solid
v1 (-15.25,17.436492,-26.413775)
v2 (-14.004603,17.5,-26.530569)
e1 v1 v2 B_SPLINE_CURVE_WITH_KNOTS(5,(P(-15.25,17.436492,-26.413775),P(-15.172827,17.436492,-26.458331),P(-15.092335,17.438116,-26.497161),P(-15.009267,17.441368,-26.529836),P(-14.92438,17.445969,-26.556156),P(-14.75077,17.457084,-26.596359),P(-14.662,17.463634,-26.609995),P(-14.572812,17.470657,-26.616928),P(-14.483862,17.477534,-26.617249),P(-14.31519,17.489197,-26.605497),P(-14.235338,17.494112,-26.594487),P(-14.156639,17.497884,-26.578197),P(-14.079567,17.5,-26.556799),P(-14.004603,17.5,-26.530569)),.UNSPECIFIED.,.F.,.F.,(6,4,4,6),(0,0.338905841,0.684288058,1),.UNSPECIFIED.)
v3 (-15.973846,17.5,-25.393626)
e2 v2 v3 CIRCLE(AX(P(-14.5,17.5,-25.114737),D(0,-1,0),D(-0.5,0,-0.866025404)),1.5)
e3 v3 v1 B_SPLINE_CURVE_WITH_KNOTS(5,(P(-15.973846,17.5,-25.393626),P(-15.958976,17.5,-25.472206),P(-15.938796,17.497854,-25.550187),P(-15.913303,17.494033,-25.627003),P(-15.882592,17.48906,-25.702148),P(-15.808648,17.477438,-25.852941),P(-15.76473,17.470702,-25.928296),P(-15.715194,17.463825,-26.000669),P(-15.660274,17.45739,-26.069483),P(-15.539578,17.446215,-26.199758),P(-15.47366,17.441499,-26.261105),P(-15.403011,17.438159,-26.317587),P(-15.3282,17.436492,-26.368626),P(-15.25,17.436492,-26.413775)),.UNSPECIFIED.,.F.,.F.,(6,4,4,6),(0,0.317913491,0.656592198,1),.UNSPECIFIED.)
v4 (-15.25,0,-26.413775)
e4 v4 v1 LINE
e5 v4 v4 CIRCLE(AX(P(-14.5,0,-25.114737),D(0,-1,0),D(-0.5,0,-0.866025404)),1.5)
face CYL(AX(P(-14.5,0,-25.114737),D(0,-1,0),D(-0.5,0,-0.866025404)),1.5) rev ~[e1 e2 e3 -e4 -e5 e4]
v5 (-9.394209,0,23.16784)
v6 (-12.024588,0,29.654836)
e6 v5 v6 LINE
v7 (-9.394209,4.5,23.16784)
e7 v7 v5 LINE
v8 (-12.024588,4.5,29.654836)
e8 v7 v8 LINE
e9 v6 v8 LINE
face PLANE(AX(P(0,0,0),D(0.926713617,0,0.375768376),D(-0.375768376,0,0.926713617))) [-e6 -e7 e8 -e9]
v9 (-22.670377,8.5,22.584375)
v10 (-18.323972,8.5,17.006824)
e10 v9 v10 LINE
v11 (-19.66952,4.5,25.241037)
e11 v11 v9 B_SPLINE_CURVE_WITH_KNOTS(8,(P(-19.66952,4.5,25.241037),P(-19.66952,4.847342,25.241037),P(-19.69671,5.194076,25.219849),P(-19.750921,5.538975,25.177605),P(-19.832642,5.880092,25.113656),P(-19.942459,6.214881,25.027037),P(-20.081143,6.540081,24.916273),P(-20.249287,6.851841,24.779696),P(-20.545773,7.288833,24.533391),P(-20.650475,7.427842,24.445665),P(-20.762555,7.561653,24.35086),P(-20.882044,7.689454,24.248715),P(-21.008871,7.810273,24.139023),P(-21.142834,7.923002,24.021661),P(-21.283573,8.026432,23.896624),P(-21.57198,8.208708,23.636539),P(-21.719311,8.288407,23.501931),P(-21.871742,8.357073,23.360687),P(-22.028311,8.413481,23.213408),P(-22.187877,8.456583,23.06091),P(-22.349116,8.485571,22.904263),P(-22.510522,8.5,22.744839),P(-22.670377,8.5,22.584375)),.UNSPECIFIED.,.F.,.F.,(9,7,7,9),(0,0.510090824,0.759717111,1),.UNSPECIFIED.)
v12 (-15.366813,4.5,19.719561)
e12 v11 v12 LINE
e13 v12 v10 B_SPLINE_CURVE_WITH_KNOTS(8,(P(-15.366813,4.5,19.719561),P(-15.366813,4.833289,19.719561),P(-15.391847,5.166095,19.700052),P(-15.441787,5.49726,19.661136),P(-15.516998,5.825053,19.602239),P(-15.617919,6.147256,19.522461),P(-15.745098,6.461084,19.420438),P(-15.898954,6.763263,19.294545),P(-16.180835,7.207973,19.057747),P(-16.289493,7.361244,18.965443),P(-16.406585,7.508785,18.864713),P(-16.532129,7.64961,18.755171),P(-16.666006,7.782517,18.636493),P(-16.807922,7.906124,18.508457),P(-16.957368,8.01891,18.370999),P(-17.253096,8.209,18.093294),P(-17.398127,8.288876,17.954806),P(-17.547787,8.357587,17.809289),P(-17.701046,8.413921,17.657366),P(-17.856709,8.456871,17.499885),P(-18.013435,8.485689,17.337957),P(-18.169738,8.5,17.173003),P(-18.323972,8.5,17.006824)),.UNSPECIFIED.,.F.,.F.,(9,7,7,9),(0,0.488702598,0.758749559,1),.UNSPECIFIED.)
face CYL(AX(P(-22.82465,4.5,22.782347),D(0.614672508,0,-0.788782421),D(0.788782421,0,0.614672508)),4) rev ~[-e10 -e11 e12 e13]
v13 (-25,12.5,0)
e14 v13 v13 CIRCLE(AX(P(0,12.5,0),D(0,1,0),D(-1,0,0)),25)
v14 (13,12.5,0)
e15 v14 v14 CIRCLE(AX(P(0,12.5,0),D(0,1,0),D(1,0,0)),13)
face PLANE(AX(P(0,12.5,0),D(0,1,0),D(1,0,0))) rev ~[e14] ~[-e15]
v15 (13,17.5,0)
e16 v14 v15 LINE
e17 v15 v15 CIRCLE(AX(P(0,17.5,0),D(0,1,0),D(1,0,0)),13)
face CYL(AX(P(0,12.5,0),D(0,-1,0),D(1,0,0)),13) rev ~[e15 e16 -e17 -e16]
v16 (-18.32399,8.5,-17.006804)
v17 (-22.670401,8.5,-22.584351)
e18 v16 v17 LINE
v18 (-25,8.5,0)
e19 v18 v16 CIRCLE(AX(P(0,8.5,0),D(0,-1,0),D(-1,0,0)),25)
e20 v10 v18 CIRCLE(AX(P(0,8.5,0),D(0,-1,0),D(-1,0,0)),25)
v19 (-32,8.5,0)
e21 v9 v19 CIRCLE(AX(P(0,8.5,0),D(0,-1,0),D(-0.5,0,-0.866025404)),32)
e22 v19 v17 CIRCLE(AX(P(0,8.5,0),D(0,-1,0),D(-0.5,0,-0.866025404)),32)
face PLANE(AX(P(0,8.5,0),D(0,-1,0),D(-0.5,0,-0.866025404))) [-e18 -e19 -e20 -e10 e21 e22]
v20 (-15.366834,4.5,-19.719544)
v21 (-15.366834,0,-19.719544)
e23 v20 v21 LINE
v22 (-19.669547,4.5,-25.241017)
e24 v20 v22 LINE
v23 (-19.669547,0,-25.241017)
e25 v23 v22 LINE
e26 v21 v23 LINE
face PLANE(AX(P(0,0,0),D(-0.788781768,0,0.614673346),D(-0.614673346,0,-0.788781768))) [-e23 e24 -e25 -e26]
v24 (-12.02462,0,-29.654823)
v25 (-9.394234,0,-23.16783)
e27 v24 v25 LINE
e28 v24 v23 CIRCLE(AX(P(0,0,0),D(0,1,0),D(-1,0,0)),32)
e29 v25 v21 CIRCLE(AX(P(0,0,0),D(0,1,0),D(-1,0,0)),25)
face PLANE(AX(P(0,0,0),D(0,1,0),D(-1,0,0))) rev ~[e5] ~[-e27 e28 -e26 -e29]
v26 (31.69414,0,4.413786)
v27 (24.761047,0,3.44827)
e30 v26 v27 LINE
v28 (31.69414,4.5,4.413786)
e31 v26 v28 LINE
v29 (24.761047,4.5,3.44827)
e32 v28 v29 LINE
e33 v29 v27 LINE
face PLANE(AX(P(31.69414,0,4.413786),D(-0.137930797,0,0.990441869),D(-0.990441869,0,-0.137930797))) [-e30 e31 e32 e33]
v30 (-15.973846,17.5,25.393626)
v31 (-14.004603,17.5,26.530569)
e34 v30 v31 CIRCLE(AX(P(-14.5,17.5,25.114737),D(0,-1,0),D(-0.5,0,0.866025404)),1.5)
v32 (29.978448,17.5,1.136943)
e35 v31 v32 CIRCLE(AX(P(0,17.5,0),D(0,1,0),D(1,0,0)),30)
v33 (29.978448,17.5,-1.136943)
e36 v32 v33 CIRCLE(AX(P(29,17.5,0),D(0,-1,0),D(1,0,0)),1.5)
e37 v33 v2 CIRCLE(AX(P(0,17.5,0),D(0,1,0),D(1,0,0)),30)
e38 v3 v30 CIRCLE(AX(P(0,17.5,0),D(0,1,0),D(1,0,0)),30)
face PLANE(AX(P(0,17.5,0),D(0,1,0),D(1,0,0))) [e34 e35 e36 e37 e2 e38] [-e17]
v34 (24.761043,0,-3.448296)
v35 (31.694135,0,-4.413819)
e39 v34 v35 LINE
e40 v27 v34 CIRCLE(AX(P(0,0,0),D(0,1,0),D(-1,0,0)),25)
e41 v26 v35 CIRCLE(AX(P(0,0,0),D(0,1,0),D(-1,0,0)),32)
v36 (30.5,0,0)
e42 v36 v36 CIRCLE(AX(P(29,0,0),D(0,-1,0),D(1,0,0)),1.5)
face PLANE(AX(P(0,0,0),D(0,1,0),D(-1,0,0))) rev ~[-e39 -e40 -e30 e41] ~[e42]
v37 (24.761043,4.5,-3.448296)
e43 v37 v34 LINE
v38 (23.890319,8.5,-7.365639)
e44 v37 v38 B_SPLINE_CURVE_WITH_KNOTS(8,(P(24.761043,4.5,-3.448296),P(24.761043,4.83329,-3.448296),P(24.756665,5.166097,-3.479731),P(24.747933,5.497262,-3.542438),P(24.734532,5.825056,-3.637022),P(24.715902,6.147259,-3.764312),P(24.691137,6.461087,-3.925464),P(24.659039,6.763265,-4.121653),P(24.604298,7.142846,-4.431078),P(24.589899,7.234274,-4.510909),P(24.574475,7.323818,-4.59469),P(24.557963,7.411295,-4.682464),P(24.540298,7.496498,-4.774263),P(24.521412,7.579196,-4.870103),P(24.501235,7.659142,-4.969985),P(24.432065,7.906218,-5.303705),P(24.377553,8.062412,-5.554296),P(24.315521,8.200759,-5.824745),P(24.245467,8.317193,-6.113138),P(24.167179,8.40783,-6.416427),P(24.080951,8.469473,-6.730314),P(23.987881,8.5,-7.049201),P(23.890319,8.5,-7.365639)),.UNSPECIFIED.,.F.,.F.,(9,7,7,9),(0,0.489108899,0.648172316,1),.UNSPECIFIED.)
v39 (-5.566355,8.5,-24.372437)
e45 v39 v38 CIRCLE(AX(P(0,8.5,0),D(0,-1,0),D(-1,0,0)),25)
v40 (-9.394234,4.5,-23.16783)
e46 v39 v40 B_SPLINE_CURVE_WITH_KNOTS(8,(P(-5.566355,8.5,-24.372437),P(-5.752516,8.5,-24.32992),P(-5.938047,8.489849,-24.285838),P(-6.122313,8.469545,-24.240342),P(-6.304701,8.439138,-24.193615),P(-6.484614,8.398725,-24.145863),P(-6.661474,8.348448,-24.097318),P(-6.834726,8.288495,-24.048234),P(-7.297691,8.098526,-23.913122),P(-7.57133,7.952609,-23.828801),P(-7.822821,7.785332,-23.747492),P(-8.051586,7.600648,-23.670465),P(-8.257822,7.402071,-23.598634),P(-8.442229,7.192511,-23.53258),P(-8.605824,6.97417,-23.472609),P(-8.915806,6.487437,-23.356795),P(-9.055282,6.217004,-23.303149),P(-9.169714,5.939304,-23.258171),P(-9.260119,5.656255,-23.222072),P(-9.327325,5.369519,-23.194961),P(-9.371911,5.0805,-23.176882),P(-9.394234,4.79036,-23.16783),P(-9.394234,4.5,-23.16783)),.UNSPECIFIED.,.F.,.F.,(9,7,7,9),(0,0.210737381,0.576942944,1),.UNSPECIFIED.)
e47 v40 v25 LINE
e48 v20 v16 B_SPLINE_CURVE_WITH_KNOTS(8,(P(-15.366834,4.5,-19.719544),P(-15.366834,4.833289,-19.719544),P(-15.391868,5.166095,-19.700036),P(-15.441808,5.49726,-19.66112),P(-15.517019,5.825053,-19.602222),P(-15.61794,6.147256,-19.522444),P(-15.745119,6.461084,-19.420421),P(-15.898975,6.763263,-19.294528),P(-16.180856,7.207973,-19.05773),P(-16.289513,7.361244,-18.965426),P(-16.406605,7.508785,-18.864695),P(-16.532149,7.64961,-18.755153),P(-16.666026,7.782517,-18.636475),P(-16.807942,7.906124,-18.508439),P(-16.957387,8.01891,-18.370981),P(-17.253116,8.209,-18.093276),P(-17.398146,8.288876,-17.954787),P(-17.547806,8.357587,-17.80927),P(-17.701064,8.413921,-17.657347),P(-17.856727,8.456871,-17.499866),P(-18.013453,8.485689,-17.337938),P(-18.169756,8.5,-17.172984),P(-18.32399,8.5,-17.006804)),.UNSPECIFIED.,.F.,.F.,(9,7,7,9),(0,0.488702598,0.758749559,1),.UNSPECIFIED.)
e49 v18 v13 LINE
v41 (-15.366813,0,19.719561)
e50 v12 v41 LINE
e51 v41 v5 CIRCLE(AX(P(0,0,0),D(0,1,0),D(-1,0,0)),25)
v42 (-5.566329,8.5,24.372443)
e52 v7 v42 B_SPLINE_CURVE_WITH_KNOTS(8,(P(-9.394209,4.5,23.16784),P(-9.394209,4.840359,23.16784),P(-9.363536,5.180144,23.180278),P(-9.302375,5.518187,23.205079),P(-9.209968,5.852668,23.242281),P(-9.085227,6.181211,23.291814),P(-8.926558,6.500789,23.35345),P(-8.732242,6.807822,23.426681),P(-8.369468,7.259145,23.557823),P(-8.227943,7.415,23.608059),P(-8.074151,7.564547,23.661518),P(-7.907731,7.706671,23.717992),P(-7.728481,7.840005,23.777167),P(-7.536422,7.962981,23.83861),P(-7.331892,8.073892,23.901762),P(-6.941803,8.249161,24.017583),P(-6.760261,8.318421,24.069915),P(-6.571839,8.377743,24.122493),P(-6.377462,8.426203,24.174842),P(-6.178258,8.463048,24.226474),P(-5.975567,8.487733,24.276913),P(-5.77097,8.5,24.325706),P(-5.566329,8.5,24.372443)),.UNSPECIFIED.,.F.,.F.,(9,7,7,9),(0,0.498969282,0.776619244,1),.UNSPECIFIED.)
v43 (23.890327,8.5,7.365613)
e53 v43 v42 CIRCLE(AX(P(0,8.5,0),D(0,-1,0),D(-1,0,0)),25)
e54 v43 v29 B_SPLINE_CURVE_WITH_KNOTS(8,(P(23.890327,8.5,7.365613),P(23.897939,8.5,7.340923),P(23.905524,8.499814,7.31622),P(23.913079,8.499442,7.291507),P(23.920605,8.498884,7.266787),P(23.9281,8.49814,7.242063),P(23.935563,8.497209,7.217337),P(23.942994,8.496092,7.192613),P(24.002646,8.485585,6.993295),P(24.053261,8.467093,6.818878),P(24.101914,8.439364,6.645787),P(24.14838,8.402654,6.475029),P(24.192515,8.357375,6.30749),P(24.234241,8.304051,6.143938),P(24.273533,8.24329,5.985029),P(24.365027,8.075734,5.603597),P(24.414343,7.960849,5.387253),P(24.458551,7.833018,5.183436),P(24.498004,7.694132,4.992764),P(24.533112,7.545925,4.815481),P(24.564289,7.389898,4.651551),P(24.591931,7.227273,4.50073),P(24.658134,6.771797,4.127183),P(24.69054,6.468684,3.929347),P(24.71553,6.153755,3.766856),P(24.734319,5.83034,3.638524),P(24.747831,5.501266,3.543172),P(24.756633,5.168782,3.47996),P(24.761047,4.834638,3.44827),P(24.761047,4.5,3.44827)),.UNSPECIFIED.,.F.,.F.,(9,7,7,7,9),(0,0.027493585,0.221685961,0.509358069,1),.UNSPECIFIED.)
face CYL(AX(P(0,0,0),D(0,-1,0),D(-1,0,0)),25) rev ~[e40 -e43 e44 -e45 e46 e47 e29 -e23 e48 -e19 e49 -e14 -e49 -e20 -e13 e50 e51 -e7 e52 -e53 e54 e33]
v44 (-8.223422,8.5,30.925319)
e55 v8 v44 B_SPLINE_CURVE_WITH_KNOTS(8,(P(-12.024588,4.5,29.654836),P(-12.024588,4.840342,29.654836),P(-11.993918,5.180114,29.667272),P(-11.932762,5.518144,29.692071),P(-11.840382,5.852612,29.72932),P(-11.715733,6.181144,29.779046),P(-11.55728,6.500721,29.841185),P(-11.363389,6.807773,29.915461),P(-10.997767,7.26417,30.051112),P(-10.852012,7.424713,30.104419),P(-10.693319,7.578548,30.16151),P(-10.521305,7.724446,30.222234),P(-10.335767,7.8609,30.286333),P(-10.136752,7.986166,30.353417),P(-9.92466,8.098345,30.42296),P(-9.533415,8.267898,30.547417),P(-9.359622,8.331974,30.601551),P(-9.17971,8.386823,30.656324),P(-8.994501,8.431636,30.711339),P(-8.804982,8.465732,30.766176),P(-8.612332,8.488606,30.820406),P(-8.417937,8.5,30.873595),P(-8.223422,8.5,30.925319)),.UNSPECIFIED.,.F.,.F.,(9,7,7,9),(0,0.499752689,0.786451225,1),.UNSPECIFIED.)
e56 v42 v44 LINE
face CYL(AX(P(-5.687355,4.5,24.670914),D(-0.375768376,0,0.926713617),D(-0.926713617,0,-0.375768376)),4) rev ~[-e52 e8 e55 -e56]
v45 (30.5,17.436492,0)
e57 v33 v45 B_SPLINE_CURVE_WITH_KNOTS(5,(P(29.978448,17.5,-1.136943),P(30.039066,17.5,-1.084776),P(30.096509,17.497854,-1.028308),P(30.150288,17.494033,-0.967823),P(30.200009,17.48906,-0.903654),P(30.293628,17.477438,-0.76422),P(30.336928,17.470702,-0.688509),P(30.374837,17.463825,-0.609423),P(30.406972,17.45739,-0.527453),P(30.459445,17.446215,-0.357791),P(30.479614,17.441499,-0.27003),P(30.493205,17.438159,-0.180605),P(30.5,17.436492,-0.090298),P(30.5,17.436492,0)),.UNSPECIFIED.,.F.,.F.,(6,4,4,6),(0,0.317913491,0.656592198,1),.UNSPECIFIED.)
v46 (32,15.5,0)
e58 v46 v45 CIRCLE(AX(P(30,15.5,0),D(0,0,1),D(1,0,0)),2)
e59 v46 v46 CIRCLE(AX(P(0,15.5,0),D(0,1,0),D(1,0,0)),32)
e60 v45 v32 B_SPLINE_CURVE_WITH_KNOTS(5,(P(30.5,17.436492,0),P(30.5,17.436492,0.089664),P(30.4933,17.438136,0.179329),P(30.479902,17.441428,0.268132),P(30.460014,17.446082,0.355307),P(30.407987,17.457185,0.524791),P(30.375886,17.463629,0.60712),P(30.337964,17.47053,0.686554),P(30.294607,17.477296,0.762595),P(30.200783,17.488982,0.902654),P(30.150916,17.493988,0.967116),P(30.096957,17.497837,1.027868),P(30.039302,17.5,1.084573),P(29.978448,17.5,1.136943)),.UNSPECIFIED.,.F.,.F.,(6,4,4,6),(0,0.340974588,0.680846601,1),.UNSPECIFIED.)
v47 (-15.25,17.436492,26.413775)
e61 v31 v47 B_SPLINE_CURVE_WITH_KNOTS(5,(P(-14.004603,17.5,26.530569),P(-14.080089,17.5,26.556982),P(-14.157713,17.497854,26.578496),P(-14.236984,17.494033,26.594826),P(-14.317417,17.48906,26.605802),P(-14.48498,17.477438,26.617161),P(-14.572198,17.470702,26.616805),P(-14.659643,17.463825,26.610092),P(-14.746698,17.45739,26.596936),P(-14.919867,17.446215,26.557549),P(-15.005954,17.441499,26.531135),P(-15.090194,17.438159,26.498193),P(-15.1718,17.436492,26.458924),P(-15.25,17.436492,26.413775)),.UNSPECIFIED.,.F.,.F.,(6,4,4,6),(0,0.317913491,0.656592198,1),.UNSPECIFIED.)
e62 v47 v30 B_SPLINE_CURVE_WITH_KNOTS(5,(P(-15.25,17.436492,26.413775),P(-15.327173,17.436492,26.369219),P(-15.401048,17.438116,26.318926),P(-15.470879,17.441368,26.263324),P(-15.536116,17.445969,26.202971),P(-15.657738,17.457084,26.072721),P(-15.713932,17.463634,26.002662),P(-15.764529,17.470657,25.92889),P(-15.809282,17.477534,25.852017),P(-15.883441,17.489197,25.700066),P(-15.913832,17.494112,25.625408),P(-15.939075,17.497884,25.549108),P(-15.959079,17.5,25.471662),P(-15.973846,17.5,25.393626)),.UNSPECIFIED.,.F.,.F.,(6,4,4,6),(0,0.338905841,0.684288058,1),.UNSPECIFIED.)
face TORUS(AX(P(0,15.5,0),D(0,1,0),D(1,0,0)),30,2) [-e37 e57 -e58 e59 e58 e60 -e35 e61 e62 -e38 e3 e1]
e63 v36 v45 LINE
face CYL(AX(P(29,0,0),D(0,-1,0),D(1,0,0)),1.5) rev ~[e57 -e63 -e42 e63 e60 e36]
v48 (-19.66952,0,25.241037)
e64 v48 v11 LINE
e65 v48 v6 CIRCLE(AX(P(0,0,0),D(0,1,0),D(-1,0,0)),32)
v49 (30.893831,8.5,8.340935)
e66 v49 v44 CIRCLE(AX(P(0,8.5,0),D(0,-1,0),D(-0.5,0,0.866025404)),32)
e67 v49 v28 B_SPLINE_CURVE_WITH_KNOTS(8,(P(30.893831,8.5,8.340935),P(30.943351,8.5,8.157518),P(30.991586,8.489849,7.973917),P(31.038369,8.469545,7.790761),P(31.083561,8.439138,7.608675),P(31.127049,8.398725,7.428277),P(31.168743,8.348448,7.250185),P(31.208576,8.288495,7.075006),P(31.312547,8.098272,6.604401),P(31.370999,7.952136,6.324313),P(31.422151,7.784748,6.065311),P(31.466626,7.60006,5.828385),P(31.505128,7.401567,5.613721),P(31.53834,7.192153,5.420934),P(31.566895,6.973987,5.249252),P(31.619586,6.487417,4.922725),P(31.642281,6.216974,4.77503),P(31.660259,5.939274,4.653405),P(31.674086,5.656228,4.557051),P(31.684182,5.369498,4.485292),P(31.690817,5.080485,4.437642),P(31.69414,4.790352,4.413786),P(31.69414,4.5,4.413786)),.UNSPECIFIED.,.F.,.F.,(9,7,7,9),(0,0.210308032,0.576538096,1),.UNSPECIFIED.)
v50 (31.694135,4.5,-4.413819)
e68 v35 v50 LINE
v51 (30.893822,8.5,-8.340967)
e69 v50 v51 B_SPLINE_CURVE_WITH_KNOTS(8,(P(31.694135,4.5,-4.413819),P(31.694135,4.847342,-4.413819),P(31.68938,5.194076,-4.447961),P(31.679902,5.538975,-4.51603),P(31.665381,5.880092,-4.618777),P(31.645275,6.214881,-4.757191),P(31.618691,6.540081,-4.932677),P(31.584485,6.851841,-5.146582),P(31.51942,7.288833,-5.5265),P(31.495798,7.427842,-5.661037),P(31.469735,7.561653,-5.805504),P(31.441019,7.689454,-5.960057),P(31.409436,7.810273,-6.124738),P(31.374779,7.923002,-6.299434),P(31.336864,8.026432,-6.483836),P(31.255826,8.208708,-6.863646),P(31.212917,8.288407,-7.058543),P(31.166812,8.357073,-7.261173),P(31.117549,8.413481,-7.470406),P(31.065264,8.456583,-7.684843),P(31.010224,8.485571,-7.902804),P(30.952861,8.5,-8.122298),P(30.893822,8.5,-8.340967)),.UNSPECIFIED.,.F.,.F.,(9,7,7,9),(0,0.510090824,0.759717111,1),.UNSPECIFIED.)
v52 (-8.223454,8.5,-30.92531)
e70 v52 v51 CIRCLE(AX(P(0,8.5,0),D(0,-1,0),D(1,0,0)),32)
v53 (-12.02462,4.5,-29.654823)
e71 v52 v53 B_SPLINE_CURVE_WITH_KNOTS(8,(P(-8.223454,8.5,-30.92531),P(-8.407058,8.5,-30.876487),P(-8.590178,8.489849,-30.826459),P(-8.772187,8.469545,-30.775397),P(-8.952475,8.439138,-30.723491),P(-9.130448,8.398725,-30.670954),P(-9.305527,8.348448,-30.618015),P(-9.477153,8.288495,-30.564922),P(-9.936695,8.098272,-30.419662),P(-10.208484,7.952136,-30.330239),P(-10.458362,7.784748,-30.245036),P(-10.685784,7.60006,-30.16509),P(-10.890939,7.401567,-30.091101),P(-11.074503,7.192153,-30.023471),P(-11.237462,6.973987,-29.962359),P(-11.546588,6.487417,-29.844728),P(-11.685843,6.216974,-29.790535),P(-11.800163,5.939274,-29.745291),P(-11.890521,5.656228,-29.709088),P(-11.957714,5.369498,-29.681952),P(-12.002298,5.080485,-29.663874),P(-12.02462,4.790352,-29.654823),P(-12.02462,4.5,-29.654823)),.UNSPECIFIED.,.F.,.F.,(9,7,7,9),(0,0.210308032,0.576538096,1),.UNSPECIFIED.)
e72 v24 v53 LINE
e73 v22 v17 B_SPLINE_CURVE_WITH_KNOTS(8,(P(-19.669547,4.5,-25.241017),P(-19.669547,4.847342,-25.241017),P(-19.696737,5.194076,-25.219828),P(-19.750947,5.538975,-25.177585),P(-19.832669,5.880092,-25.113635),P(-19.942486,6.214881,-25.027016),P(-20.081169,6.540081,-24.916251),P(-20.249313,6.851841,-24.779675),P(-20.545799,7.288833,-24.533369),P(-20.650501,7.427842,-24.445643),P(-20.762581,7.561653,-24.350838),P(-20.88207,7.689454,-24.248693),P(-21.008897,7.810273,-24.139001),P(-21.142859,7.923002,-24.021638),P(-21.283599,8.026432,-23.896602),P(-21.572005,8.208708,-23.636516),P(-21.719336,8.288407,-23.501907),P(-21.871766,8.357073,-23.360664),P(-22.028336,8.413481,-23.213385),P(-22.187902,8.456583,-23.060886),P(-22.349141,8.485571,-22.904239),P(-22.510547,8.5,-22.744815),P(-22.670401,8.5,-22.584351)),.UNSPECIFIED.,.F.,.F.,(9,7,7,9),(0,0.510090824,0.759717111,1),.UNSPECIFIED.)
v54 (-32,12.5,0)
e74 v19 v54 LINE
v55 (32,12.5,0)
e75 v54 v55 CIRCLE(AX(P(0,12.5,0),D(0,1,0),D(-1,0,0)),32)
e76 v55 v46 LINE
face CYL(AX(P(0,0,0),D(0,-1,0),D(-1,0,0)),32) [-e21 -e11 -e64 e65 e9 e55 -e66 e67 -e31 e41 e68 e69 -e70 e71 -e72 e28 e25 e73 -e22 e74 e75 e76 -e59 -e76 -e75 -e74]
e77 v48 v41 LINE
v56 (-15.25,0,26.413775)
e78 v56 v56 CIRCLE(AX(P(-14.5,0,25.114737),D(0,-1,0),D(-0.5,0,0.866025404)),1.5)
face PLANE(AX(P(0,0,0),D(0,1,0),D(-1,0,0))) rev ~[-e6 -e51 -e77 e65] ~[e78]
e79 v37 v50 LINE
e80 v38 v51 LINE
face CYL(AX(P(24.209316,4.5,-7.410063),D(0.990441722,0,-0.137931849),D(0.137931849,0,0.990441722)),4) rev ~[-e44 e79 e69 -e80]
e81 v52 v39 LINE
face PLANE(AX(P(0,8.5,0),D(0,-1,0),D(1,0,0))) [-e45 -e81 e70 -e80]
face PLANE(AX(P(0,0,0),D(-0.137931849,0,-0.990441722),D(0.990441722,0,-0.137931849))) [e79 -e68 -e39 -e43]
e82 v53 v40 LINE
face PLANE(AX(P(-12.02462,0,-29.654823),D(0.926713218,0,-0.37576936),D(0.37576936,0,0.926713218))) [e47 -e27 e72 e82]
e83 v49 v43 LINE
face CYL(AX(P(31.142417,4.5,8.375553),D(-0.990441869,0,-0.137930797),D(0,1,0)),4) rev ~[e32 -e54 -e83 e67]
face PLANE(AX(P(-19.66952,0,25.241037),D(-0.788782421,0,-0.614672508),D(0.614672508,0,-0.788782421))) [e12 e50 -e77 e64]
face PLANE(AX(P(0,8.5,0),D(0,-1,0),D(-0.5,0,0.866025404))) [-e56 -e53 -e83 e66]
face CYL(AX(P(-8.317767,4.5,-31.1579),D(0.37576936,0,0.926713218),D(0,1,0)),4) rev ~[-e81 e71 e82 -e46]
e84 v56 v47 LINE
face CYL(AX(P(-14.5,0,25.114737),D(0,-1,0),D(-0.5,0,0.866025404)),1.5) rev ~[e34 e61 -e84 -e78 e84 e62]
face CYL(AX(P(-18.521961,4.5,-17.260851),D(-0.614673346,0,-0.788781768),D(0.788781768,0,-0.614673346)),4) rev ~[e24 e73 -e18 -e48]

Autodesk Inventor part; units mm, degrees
ref_plane "YZ Plane" through (0, 0, 0) normal (1, 0, 0) x (0, 1, 0)
ref_plane "XZ Plane" through (0, 0, 0) normal (0, 1, 0) x (-1, 0, 0)
ref_plane "XY Plane" through (0, 0, 0) normal (0, 0, 1) x (1, 0, 0)
sketch "Sketch1" plane through (0, 0, 0) normal (0, 1, 0) x (-1, 0, 0)
  circle A0 centre (0, 0) radius 25
  circle A1 centre (0, 0) radius 32
  dimension "d0" = 50
  dimension "d1" = 64
extrude "Extrusion1" add sketch "Sketch1" along normal blind 12.5
sketch "Sketch2" plane through (0, 12.5, 0) normal (0, 1, 0) x (1, 0, 0)
  circle A0 centre (0, 0) radius 13
  circle A1 centre (0, 0) radius 32
  dimension "d4" = 26
extrude "Extrusion2" add sketch "Sketch2" along normal blind 5
sketch "Sketch4" plane through (0, 0, 0) normal (0, -1, 0) x (1, 0, 0)
  circle A0 centre (29, 0) radius 1.5
  circle A1 centre (0, 0) radius 25 projected
  circle A2 centre (0, 0) radius 32 projected
  dimension "d7" = 3
  dimension "d9" = 29
extrude "Extrusion3" cut sketch "Sketch4" against normal through all contours A0
pattern_circular "Circular Pattern1" count 3 over 360 about axis through (0, 0, 0) along (0, 1, 0) of "Extrusion3"
sketch "Sketch5" plane through (0, 0, 0) normal (0, -1, 0) x (1, 0, 0)
  line L0 (0, 0) -> (36.6386, -5.1024)
  line L1 (36.6386, -5.1024) -> (37.4304, -25.9892)
  line L2 (37.4304, -25.9892) -> (-15.9101, -39.2371)
  circle A0 centre (0, 0) radius 32 projected
  line L3 (-15.9101, -39.2371) -> (0, 0)
  circle A1 centre (29, 0) radius 1.5 projected
  circle A2 centre (-14.5, -25.1147) radius 1.5 projected
  point P0 (-12.0246, -29.6548)
  point P1 (31.6941, -4.4138)
  dimension "d15" = 4
  dimension "d22" = 4
extrude "Extrusion4" cut sketch "Sketch5" against normal blind 8.5 contours L0 A0 L3 picked at (12.6104, -17.0364)
pattern_circular "Circular Pattern2" count 3 over 360 about axis through (0, 12.5, 0) along (0, 1, 0) of "Extrusion4"
fillet "Fillet1" radius 4 6 edges at (28.2276, 8.5, -3.931) (-10.7094, 8.5, -26.4113) (-17.5182, 8.5, -22.4803) (-17.5182, 8.5, 22.4803) (-10.7094, 8.5, 26.4113) (28.2276, 8.5, 3.931)
fillet "Fillet2" radius 2 1 edges at (-32, 17.5, 0)
properties part number "Engine retention"
